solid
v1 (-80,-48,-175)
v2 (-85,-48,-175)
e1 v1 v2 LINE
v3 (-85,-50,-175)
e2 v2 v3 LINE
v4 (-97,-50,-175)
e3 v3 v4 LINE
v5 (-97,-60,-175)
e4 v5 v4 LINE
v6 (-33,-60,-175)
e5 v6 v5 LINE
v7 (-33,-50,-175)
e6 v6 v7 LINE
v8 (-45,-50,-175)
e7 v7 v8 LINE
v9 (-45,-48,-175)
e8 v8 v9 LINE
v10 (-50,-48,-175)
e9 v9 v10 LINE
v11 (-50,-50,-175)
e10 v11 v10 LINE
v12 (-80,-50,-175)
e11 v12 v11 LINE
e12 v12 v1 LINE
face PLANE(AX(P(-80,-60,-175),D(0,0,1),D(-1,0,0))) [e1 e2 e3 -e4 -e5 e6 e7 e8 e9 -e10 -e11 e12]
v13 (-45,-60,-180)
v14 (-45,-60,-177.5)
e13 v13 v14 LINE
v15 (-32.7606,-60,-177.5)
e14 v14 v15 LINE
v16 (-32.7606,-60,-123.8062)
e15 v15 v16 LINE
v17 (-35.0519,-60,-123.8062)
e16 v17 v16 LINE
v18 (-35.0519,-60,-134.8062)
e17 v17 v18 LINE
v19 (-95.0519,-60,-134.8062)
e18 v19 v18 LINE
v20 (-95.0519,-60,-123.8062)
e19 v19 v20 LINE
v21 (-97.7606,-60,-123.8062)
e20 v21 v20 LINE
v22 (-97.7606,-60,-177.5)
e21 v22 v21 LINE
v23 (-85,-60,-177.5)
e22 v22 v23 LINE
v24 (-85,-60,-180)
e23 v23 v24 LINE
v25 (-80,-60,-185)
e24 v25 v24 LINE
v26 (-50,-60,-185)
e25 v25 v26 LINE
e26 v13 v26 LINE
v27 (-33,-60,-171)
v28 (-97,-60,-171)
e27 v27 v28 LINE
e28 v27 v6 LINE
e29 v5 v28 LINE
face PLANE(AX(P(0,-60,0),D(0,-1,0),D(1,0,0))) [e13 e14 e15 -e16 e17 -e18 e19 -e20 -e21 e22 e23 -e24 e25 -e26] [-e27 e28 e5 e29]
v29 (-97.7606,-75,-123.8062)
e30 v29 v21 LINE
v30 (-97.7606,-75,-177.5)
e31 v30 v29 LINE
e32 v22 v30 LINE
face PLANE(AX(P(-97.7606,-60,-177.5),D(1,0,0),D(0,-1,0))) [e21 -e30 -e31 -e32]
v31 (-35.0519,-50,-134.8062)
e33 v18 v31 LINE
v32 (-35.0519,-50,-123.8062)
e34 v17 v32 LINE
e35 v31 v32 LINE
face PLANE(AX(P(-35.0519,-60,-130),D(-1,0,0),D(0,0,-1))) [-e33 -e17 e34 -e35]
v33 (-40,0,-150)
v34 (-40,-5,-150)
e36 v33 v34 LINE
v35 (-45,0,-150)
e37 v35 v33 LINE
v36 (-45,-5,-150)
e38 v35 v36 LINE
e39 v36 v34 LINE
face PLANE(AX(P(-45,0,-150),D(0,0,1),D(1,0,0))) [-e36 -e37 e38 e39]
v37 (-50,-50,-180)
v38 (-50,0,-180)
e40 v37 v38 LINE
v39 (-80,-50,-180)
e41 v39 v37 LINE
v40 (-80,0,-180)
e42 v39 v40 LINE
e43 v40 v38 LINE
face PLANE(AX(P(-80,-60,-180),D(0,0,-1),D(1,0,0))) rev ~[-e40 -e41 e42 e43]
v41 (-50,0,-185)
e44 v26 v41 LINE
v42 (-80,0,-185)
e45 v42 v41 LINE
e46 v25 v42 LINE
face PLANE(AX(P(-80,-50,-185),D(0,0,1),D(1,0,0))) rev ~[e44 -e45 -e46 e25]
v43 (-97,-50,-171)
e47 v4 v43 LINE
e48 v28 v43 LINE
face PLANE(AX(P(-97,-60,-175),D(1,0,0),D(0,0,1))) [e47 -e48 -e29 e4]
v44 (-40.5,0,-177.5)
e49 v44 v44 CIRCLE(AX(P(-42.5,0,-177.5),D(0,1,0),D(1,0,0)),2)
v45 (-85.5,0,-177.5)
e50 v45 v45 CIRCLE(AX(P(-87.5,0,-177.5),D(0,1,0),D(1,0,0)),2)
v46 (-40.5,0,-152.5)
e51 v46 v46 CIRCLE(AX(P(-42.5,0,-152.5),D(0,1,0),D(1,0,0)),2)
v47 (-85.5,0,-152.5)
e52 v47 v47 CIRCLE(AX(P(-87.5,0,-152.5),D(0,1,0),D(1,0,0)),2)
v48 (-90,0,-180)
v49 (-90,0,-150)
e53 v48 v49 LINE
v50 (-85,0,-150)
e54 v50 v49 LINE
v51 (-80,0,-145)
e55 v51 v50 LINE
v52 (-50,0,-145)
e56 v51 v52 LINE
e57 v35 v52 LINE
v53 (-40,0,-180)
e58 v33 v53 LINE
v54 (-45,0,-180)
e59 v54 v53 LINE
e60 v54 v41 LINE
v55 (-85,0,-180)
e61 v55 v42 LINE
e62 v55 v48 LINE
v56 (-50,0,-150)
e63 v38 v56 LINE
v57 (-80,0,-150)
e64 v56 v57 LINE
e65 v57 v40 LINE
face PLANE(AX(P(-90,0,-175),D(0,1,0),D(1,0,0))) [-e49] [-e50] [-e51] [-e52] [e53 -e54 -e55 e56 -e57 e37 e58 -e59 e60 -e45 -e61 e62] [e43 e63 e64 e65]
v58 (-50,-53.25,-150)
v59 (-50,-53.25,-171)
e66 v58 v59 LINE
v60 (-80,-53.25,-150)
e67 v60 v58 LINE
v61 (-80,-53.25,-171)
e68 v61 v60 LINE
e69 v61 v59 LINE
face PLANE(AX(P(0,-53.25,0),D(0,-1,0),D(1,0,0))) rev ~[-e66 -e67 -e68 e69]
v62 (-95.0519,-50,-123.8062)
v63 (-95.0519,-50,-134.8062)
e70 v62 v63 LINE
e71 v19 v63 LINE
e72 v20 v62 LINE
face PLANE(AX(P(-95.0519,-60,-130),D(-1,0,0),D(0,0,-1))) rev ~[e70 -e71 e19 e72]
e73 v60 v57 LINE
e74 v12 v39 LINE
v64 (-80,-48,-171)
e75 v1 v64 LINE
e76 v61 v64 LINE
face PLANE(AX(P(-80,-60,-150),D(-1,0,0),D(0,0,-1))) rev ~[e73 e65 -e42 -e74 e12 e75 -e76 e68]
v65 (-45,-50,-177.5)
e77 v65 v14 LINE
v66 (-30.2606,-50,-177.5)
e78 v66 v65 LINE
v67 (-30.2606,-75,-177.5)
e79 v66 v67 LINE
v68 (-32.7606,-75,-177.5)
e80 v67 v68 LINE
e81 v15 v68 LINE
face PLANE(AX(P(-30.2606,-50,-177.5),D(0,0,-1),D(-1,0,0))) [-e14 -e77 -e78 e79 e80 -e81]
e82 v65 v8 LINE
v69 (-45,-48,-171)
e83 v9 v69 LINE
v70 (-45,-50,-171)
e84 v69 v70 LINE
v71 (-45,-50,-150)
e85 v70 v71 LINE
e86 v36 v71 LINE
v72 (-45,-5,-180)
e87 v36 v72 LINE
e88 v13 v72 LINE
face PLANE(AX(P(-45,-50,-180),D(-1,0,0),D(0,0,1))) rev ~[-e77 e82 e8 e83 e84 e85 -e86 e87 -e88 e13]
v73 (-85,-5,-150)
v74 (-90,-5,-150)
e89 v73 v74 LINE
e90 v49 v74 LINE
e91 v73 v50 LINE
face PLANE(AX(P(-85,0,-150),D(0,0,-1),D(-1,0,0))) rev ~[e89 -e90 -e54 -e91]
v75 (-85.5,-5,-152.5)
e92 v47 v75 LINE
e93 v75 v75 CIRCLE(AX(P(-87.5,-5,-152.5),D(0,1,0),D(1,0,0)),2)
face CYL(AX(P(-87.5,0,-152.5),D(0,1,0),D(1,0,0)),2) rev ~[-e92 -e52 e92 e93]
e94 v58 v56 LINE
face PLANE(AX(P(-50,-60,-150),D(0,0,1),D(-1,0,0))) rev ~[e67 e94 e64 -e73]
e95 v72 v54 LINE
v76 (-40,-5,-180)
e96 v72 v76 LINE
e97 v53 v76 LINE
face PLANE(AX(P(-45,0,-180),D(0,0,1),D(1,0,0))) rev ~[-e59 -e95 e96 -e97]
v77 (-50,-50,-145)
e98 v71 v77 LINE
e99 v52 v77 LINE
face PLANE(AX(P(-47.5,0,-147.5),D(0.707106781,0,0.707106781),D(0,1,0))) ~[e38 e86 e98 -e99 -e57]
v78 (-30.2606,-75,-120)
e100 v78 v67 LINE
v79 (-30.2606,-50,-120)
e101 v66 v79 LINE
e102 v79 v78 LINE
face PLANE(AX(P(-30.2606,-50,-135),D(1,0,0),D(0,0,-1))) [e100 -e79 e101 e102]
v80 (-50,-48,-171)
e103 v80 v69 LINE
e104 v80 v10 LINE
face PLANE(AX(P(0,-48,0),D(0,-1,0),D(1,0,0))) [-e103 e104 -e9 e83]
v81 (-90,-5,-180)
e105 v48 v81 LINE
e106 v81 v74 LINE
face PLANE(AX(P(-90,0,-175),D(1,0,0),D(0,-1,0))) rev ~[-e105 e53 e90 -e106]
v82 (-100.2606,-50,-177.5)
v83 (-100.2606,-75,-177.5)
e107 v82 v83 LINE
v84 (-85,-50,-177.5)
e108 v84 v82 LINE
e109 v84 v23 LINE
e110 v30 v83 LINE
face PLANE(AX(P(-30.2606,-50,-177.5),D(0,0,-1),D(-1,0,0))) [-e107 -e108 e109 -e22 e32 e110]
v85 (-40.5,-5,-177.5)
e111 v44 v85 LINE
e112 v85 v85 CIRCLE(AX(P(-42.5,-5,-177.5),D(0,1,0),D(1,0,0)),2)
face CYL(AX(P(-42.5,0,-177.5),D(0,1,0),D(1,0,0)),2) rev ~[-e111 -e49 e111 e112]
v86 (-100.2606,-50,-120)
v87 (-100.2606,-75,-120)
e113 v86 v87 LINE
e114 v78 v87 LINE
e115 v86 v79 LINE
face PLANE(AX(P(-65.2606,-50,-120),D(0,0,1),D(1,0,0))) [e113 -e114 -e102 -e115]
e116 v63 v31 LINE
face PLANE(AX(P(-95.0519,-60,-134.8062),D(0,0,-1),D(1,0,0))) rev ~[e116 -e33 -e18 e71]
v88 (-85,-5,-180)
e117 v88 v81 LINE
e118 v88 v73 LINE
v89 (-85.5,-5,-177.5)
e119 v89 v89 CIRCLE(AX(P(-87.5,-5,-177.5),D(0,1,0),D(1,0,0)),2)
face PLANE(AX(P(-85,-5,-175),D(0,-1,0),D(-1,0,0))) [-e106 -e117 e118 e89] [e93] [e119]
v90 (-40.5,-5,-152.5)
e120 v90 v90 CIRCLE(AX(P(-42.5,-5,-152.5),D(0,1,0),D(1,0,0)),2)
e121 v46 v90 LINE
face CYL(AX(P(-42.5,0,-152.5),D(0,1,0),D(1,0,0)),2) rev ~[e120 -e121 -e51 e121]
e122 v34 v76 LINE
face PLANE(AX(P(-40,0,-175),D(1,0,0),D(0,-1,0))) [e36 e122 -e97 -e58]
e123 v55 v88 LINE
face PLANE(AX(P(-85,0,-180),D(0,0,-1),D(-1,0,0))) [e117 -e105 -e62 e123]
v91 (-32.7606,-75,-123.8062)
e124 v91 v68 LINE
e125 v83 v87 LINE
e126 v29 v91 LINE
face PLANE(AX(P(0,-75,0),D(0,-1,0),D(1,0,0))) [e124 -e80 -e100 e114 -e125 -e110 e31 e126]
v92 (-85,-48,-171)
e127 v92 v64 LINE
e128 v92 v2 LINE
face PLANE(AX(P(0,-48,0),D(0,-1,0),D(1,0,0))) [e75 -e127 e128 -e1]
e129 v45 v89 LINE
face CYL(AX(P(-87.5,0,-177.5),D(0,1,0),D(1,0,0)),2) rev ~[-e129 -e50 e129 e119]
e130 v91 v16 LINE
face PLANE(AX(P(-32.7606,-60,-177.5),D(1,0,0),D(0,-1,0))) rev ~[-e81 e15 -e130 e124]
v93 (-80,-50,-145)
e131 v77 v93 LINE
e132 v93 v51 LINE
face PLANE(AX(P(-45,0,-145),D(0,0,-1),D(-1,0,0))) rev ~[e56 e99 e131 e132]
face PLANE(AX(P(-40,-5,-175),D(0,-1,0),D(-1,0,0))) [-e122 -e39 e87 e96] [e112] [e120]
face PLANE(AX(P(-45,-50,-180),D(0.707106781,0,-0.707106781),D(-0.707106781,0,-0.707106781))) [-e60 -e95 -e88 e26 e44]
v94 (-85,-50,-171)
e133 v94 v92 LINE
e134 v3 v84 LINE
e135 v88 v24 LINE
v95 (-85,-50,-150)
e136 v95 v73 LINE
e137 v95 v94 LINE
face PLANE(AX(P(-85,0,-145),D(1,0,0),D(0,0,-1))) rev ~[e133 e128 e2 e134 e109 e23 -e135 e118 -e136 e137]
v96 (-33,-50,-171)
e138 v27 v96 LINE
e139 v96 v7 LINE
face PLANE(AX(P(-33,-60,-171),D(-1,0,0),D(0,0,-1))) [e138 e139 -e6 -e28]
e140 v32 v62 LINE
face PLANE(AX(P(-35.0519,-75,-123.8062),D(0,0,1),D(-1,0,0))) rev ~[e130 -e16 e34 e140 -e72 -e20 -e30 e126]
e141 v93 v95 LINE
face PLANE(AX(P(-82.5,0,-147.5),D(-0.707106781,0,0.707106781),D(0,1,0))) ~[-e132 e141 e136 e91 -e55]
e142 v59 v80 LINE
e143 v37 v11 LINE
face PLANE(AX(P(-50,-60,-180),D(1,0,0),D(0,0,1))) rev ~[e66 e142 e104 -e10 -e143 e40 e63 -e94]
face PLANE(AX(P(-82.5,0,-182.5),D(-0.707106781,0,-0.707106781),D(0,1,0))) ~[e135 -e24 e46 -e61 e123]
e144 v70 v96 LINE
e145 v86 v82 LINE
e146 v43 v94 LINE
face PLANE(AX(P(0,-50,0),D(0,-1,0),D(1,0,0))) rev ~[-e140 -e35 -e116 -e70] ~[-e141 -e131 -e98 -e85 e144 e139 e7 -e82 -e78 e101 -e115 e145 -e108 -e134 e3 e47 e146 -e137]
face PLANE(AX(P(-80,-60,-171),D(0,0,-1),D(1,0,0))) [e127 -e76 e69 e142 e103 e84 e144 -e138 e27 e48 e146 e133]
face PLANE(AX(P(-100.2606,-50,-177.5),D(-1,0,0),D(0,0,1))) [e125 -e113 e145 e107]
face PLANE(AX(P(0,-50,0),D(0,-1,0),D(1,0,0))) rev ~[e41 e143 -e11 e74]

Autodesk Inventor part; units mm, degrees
ref_plane "YZ Plane" through (0, 0, 0) normal (1, 0, 0) x (0, 1, 0)
sketch "Boceto1" plane through (0, 0, 0) normal (0, 1, 0) x (-1, 0, 0)
  line L0 (0, 0) -> (0, -154)
  line L1 (35, -185) -> (95, -185)
  line L2 (130, -154) -> (130, 0)
  line L3 (130, 0) -> (0, 0)
  line L4 (0, 0) -> (0, -154) construction
  line L5 (65, -185) -> (95, -185) construction
  line L6 (95, -185) -> (95, -206.4869) construction
  line L7 (95, -206.4869) -> (35, -206.4869) construction
  line L8 (35, -206.4869) -> (35, -185) construction
  line L9 (0, -154) -> (35, -185)
  line L10 (95, -185) -> (130, -154)
  line L11 (61.4516, 0) -> (61.4516, -5) construction
  line L12 (130, -81.3037) -> (125, -81.3037) construction
  line L13 (0, -85.0807) -> (5, -85.0807) construction
  line L14 (125, -5) -> (5, -5)
  line L15 (5, -5) -> (5, -148.3548)
  line L16 (125, -148.3548) -> (125, -5)
  line L17 (112.5, -169.5) -> (109.1848, -165.7571) construction
  line L18 (65, -185) -> (65, -180) construction
  line L19 (17.5, -169.5) -> (20.8152, -165.7571) construction
  line L20 (20.8152, -165.7571) -> (5, -151.7493)
  line L21 (20.8152, -165.7571) -> (36.8959, -180)
  line L22 (36.8959, -180) -> (93.1041, -180)
  line L23 (93.1041, -180) -> (125, -151.7493)
  line L24 (125, -151.7493) -> (125, -148.3548)
  line L25 (5, -148.3548) -> (5, -151.7493)
  dimension "d2" = 154
  dimension "d3" = 30
  dimension "d4" = 60
  dimension "d5" = 5
  dimension "d6" = 5
  dimension "d7" = 5
  dimension "d8" = 5
  dimension "d9" = 5
  dimension "d10" = 5
extrude "Extrusión1" add sketch "Boceto1" along normal blind 3 contours L16 L24 L23 L22 L21 L20 L25 L15 L14
extrude "Extrusión2" add sketch "Boceto1" along normal blind 35
ref_plane "Plano de trabajo1" through (0, 20, 0) normal (0, 1, 0) x (-1, 0, 0)
sketch "Boceto2" plane through (0, 20, 0) normal (0, 1, 0) x (-1, 0, 0)
  line L0 (0, 0) -> (0, -154) construction
  line L1 (0, 0) -> (0, -26.749) construction
  line L2 (130, -154) -> (130, 0) construction
  line L3 (125, -151.7493) -> (93.1041, -180) construction
  line L4 (125, -151.7493) -> (5, -151.7493) construction
  line L5 (65, -151.7493) -> (65, -26.749) construction
  line L6 (125, -89.2492) -> (5, -89.2492) construction
  line L7 (5, -151.7493) -> (5, -5) construction
  line L8 (125, -26.749) -> (125, -31.749) construction
  line L9 (125, -31.749) -> (120, -31.749) construction
  line L10 (120, -31.749) -> (120, -26.749) construction
  line L11 (125, -31.749) -> (120, -26.749) construction
  line L12 (120, -31.749) -> (125, -26.749) construction
  line L13 (125, -31.749) -> (125, -26.749)
  arc A0 (120, -26.749) -> (125, -31.749) centre (122.5, -29.249) ccw
  line L14 (5, -26.749) -> (5, -31.749) construction
  line L15 (5, -31.749) -> (5, -26.749)
  arc A1 (5, -31.749) -> (10, -26.749) centre (7.5, -29.249) ccw
  arc A2 (125, -26.749) -> (120.5, -32.1645) centre (122.5, -29.249) ccw
  arc A3 (10.6306, -27.606) -> (5, -26.749) centre (7.5, -29.249) ccw
  line L16 (5, -26.749) -> (5, -173.4983) construction
  line L17 (125, -151.7493) -> (125, -146.7493) construction
  line L18 (120, -146.7493) -> (125, -151.7493) construction
  line L19 (125, -146.7493) -> (125, -151.7493)
  arc A4 (125, -146.7493) -> (120, -151.7493) centre (122.5, -149.2493) ccw
  arc A5 (10, -151.7493) -> (5, -146.7493) centre (7.5, -149.2493) ccw
  line L20 (5, -151.7493) -> (5, -146.7493) construction
  line L21 (5, -146.7493) -> (5, -151.7493)
  arc A6 (120.5, -146.3339) -> (125, -151.7493) centre (122.5, -149.2493) ccw
  arc A7 (5, -151.7493) -> (10.6306, -150.8923) centre (7.5, -149.2493) ccw
  circle A8 centre (7.5, -29.249) radius 2.5
  circle A9 centre (122.5, -29.249) radius 2.5
  circle A10 centre (122.5, -149.2493) radius 2.5
  circle A11 centre (7.5, -149.2493) radius 2.5
  point P0 (10, -151.7493)
  point P1 (10, -26.749)
  point P2 (120, -26.749)
  dimension "d16" = 26.749
  dimension "d43" = 5
  dimension "d44" = 5
  dimension "d45" = 5
  dimension "d46" = 5
extrude "Extrusión3" add sketch "Boceto2" against normal blind 17 contours A9 | A0 A2 L13 | A8 | L15 A3 A1 | A10 | L19 A6 A4 | A11 | A7 L21 A5
extrude "Extrusión4" cut sketch "Boceto2" against normal through all contours A9 | A8 | A10 | A11
sketch "Boceto3" plane through (0, 3, 0) normal (0, 1, 0) x (1, 0, 0)
  line L0 (-125, 5) -> (-5, 5) construction
  line L1 (-65, 5) -> (-110, 5) construction
  line L2 (-110, 5) -> (-110, 15) construction
  line L3 (-110, 15) -> (-20, 15)
  line L4 (-20, 15) -> (-20, 139.5644)
  line L5 (-110, 139.5644) -> (-110, 15)
  line L6 (-106.9205, 15) -> (-103.9205, 15)
  line L7 (-20, 139.5644) -> (-20, 15)
  line L8 (-110, 15) -> (-20, 15)
  line L9 (-110, 15) -> (-110, 139.5644)
  line L10 (-83.4405, 15) -> (-81.4405, 15)
  line L11 (-77.5705, 15) -> (-75.5705, 15)
  line L12 (-87.3105, 15) -> (-89.3105, 15)
  line L13 (-93.1805, 15) -> (-95.1805, 15)
  line L14 (-98.0505, 15) -> (-100.0505, 15)
  line L15 (-103.9205, 15) -> (-106.9205, 15)
  line L16 (-71.7005, 15) -> (-69.7005, 15)
  line L17 (-65.8305, 15) -> (-63.8305, 15)
  line L18 (-59.9605, 15) -> (-57.9605, 15)
  line L19 (-54.0905, 15) -> (-52.0905, 15)
  line L20 (-48.2205, 15) -> (-46.2205, 15)
  line L21 (-42.3505, 15) -> (-40.3505, 15)
  line L22 (-36.4805, 15) -> (-34.4805, 15)
  line L23 (-30.6105, 15) -> (-28.6105, 15)
  line L24 (-24.7405, 15) -> (-22.7405, 15)
  line L25 (-35, 185) -> (-95, 185) projected
  line L26 (-20, 139.5644) -> (-110, 139.5644)
  line L27 (-103.9205, 15) -> (-103.9205, 139.5644)
  line L28 (-106.9205, 139.5644) -> (-106.9205, 15)
  line L29 (-100.9205, 15) -> (-100.9205, 139.5644)
  line L30 (-103.9205, 139.5644) -> (-103.9205, 15)
  line L31 (-97.9205, 15) -> (-97.9205, 139.5644)
  line L32 (-100.9205, 139.5644) -> (-100.9205, 15)
  line L33 (-94.9205, 15) -> (-94.9205, 139.5644)
  line L34 (-97.9205, 139.5644) -> (-97.9205, 15)
  line L35 (-91.9205, 15) -> (-91.9205, 139.5644)
  line L36 (-94.9205, 139.5644) -> (-94.9205, 15)
  line L37 (-88.9205, 15) -> (-88.9205, 139.5644)
  line L38 (-91.9205, 139.5644) -> (-91.9205, 15)
  line L39 (-85.9205, 15) -> (-85.9205, 139.5644)
  line L40 (-88.9205, 139.5644) -> (-88.9205, 15)
  line L41 (-82.9205, 15) -> (-82.9205, 139.5644)
  line L42 (-85.9205, 139.5644) -> (-85.9205, 15)
  line L43 (-79.9205, 15) -> (-79.9205, 139.5644)
  line L44 (-82.9205, 139.5644) -> (-82.9205, 15)
  line L45 (-76.9205, 15) -> (-76.9205, 139.5644)
  line L46 (-79.9205, 139.5644) -> (-79.9205, 15)
  line L47 (-73.9205, 15) -> (-73.9205, 139.5644)
  line L48 (-76.9205, 139.5644) -> (-76.9205, 15)
  line L49 (-70.9205, 15) -> (-70.9205, 139.5644)
  line L50 (-73.9205, 139.5644) -> (-73.9205, 15)
  line L51 (-67.9205, 15) -> (-67.9205, 139.5644)
  line L52 (-70.9205, 139.5644) -> (-70.9205, 15)
  line L53 (-64.9205, 15) -> (-64.9205, 139.5644)
  line L54 (-67.9205, 139.5644) -> (-67.9205, 15)
  line L55 (-61.9205, 15) -> (-61.9205, 139.5644)
  line L56 (-64.9205, 139.5644) -> (-64.9205, 15)
  line L57 (-58.9205, 15) -> (-58.9205, 139.5644)
  line L58 (-61.9205, 139.5644) -> (-61.9205, 15)
  line L59 (-55.9205, 15) -> (-55.9205, 139.5644)
  line L60 (-58.9205, 139.5644) -> (-58.9205, 15)
  line L61 (-52.9205, 15) -> (-52.9205, 139.5644)
  line L62 (-55.9205, 139.5644) -> (-55.9205, 15)
  line L63 (-49.9205, 15) -> (-49.9205, 139.5644)
  line L64 (-52.9205, 139.5644) -> (-52.9205, 15)
  line L65 (-46.9205, 15) -> (-46.9205, 139.5644)
  line L66 (-49.9205, 139.5644) -> (-49.9205, 15)
  line L67 (-43.9205, 15) -> (-43.9205, 139.5644)
  line L68 (-46.9205, 139.5644) -> (-46.9205, 15)
  line L69 (-40.9205, 15) -> (-40.9205, 139.5644)
  line L70 (-43.9205, 139.5644) -> (-43.9205, 15)
  line L71 (-37.9205, 15) -> (-37.9205, 139.5644)
  line L72 (-40.9205, 139.5644) -> (-40.9205, 15)
  line L73 (-34.9205, 15) -> (-34.9205, 139.5644)
  line L74 (-37.9205, 139.5644) -> (-37.9205, 15)
  line L75 (-31.9205, 15) -> (-31.9205, 139.5644)
  line L76 (-34.9205, 139.5644) -> (-34.9205, 15)
  line L77 (-28.9205, 15) -> (-28.9205, 139.5644)
  line L78 (-31.9205, 139.5644) -> (-31.9205, 15)
  line L79 (-25.9205, 15) -> (-25.9205, 139.5644)
  line L80 (-28.9205, 139.5644) -> (-28.9205, 15)
  line L81 (-22.9205, 15) -> (-22.9205, 139.5644)
  line L82 (-25.9205, 139.5644) -> (-25.9205, 15)
  point P0 (0, 0)
  dimension "d24" = 45
  dimension "d25" = 10
  dimension "d32" = 5.87
  dimension "d47" = 3
  dimension "d50" = 3
extrude "Extrusión5" cut sketch "Boceto3" against normal blind 10 contours L5 L26 L28 L3 | L27 L26 L29 L3 | L26 L33 L3 L31 | L26 L37 L3 L35 | L26 L41 L3 L39 | L26 L45 L3 L43 | L26 L49 L3 L47 | L26 L53 L3 L51 | L26 L57 L3 L55 | L26 L61 L3 L59 | L26 L65 L3 L63 | L26 L69 L3 L67 | L26 L73 L3 L71 | L26 L77 L3 L75 | L26 L81 L3 L79
fillet "Empalme1" radius 5 4 edges at (-130, 17.5, 0) (0, 17.5, 0) (0, 17.5, -154) (-130, 17.5, -154)
fillet "Empalme2" radius 5 2 edges at (-95, 17.5, -185) (-35, 17.5, -185)
sketch "Sketch5" plane through (-125, 3, -146.7493) normal (1, 0, 0) x (0, 0, -1)
  line L0 (0, 0) -> (-115.0003, 0) construction
  line L1 (-110.8969, 0) -> (-110.8969, 17.0593) construction
  line L2 (-4.4814, 0) -> (-4.4814, 32) construction
  line L3 (-141.7493, 32) -> (5, 32) construction
  line L4 (-110.8969, 0) -> (-4.4814, 0)
  line L5 (-4.4814, 0) -> (-4.4814, 25.5232)
  line L6 (-4.4814, 25.5232) -> (-110.8969, 25.5232)
  line L7 (-110.8969, 25.5232) -> (-110.8969, 0)
  line L8 (-110.8969, 25.5232) -> (-4.4814, 25.5232)
  line L9 (-4.4814, 25.5232) -> (-4.4814, 52.7113)
  line L10 (-4.4814, 52.7113) -> (-110.8969, 52.7113)
  line L11 (-110.8969, 52.7113) -> (-110.8969, 25.5232)
  point P0 (-146.7493, -3)
  point P1 (-115.0003, 17)
  point P2 (0, 17)
  point P3 (5, 32)
extrude "Extrusion6" cut sketch "Sketch5" against normal through all
sketch "Sketch6" plane through (-122.5, 20, -29.249) normal (0, 1, 0) x (1, 0, 0)
  arc A0 (-2.5, -2.5) -> (-2.5, 2.5) centre (0, 0) ccw projected
  circle A1 centre (0, 0) radius 2.5 projected
  arc A2 (-2.5, 117.5003) -> (-2.1798, 122.784) centre (0, 120.0003) ccw projected
  circle A3 centre (0, 120.0003) radius 2.5 projected
  arc A4 (117.1798, 122.784) -> (117.5, 117.5003) centre (115, 120.0003) ccw projected
  circle A5 centre (115, 120.0003) radius 2.5 projected
  circle A6 centre (115, 0) radius 2.5 projected
  arc A7 (117.5, 2.5) -> (117.5, -2.5) centre (115, 0) ccw projected
  circle A8 centre (0, 0) radius 2.5
  circle A9 centre (0, 0) radius 3.5355
  circle A10 centre (0, 120.0003) radius 2.5
  circle A11 centre (0, 120.0003) radius 3.5355
  circle A12 centre (115, 120.0003) radius 2.5
  circle A13 centre (115, 120.0003) radius 3.5355
  circle A14 centre (115, 0) radius 2.5
  circle A15 centre (115, 0) radius 3.5355
  point P0 (122.5, -29.249)
  point P1 (-2.5, 0)
  point P2 (-2.5, 120.0003)
  point P3 (117.5, 120.0003)
  point P4 (117.5, 0)
  point P5 (-2.5, -2.5)
  point P6 (-2.5, 117.5003)
  point P7 (117.5, 117.5003)
  point P8 (117.5, -2.5)
extrude "Extrusion7" add sketch "Sketch6" along normal blind 15
sketch "Sketch7" plane through (0, 0, 0) normal (0, -1, 0) x (1, 0, 0)
  line L0 (-36.8959, -185) -> (-93.1041, -185) construction
  line L1 (-65, -185) -> (-65, 0) construction
  line L2 (-125, 0) -> (-5, 0) construction
  line L3 (-130, -35.8525) -> (-130, -142.2679) construction
  line L4 (-130, -142.2679) -> (0, -142.2679) construction
  line L5 (-65, -185) -> (-85, -185) construction
  line L6 (-65, -185) -> (-45, -185) construction
  line L7 (-45, -185) -> (-45, -145) construction
  line L8 (-45, -145) -> (-85, -145) construction
  line L9 (-45, -145) -> (-85, -145)
  line L10 (-85, -145) -> (-85, -185)
  line L11 (-85, -185) -> (-45, -185)
  line L12 (-45, -185) -> (-45, -145)
  point P0 (0, 0)
  dimension "d57" = 20
  dimension "d58" = 20
  dimension "d59" = 40
extrude "Extrusion8" add sketch "Sketch7" along normal blind 50
sketch "Sketch8" plane through (0, -50, 0) normal (0, -1, 0) x (1, 0, 0)
  line L0 (-45, -185) -> (-45, -145) construction
  line L1 (-45, -145) -> (-85.5281, -185) construction
  line L2 (-36.8959, -185) -> (-93.1041, -185) construction
  line L3 (-85, -145) -> (-85, -185) construction
  line L4 (-85, -145) -> (-45.5212, -185) construction
  line L5 (-32.7606, -175) -> (-32.7606, -137.5)
  line L6 (-32.7606, -137.5) -> (-97.7606, -137.5)
  line L7 (-97.7606, -137.5) -> (-97.7606, -175)
  line L8 (-97.7606, -192.5) -> (-32.7606, -137.5) construction
  line L9 (-32.7606, -192.5) -> (-97.7606, -137.5) construction
  line L10 (-30.2606, -195) -> (-100.2606, -195)
  line L11 (-100.2606, -195) -> (-100.2606, -135)
  line L12 (-100.2606, -135) -> (-30.2606, -195) construction
  line L13 (-30.2606, -135) -> (-100.2606, -195) construction
  line L14 (-65.2606, -135) -> (-65.2606, -130) construction
  line L15 (-65.2606, -130) -> (-100.2606, -130)
  line L16 (-100.2606, -130) -> (-100.2606, -135)
  line L17 (-30.2606, -135) -> (-30.2606, -130)
  line L18 (-30.2606, -130) -> (-65.2606, -130)
  line L19 (-65.2606, -130) -> (-65.2606, -125) construction
  line L20 (-64.9205, -139.5644) -> (-64.9205, -15) construction
  line L21 (-65.2606, -125) -> (-100.2606, -125)
  line L22 (-100.9205, -139.5644) -> (-100.9205, -15) projected
  line L23 (-100.2606, -130) -> (-100.2606, -125)
  line L24 (-65.2606, -125) -> (-30.2606, -125)
  line L25 (-30.2606, -125) -> (-30.2606, -130)
  line L26 (-65.2606, -125) -> (-65.2606, -120) construction
  line L27 (-100.2606, -125) -> (-100.2606, -120)
  line L28 (-100.2606, -120) -> (-65.2606, -120)
  line L29 (-65.2606, -120) -> (-30.2606, -120)
  line L30 (-30.2606, -120) -> (-30.2606, -125)
  line L31 (-100.2606, -195) -> (-100.2606, -175) construction
  line L32 (-97.7606, -175) -> (-32.7606, -175)
  line L33 (-97.7606, -192.5) -> (-97.3439, -192.5)
  line L34 (-33.1773, -192.5) -> (-32.7606, -192.5)
  line L35 (-32.7606, -175) -> (-32.7606, -177.5) construction
  line L36 (-30.2606, -177.5) -> (-100.2606, -177.5)
  line L37 (-30.2606, -135) -> (-30.2606, -195)
  line L38 (-28.9205, -15) -> (-28.9205, -139.5644) projected
  point P0 (0, 0)
  point P1 (-65.2606, -165)
  point P2 (-64.9205, -15)
  dimension "d62" = 65
  dimension "d63" = 55
  dimension "d64" = 70
  dimension "d65" = 60
  dimension "d96" = 5
  dimension "d101" = 5
  dimension "d112" = 20
  dimension "d113" = 2.5
extrude "Extrusion9" add sketch "Sketch8" along normal blind 10 contours L32 L7 L6 L5
extrude "Extrusion10" add sketch "Sketch8" along normal blind 25 contours L18 L15 L23 L21 L24 L25 | L24 L21 L27 L28 L29 L30
chamfer "Chamfer3" distance 5 angle 45 2 edges at (-85, -25, -145) (-45, -25, -145)
ref_plane "Work Plane2" through (0, -75, 0) normal (0, -1, 0) x (1, 0, 0)
chamfer "Chamfer4" distance 5 angle 45 2 edges at (-45, -25, -185) (-85, -25, -185)
sketch "Sketch12" plane through (0, -75, 0) normal (0, -1, 0) x (1, 0, 0)
  point P0 (0, 0)
sketch "Sketch13" plane through (0, -75, 0) normal (0, -1, 0) x (1, 0, 0)
  line L0 (-30.2606, -125) -> (-100.2606, -125) construction
  line L1 (-97.7606, -137.5) -> (-32.7606, -137.5) construction
  line L2 (-65.2606, -137.5) -> (-65.2606, -125) construction
  line L3 (-97.7606, -137.5) -> (-97.7606, -125) construction
  line L4 (-32.7606, -137.5) -> (-32.7606, -125) construction
  line L5 (-97.7606, -131.25) -> (-32.7606, -131.25) construction
  line L6 (-95.2606, -136.25) -> (-35.2606, -126.25) construction
  line L7 (-35.2606, -136.25) -> (-95.2606, -126.25) construction
  line L8 (-30.2606, -120) -> (-100.2606, -120) construction
  line L9 (-97.7606, -125) -> (-97.9205, -120) construction
  line L10 (-97.9205, -15) -> (-97.9205, -139.5644) construction
  line L11 (-35.2606, -126.25) -> (-35.2606, -120) construction
  line L12 (-32.7606, -137.5) -> (-32.7606, -192.5) construction
  line L13 (-97.7606, -120) -> (-32.7606, -137.5) construction
  line L14 (-97.7606, -137.5) -> (-31.9205, -120) construction
  line L15 (-31.9205, -15) -> (-31.9205, -139.5644) construction
  line L16 (-95.0519, -133.8062) -> (-35.0519, -133.8062)
  line L17 (-35.0519, -133.8062) -> (-35.0519, -123.8062)
  line L18 (-35.0519, -123.8062) -> (-95.0519, -123.8062)
  line L19 (-95.0519, -123.8062) -> (-95.0519, -133.8062)
  line L20 (-95.0519, -133.8062) -> (-35.0519, -123.8062) construction
  line L21 (-35.0519, -133.8062) -> (-95.0519, -123.8062) construction
  point P0 (0, 0)
  point P1 (-65.2606, -131.25)
  point P2 (-65.0519, -128.8062)
  dimension "d102" = 60
  dimension "d103" = 10
extrude "Extrusion12" cut sketch "Sketch13" against normal blind 25
sketch "Sketch14" plane through (0, -75, 0) normal (0, -1, 0) x (1, 0, 0)
  line L0 (-32.7606, -137.5) -> (-32.7606, -192.5) projected
  line L1 (-95.0519, -130) -> (-95.0519, -123.8062) projected
  line L2 (-95.0519, -123.8062) -> (-35.0519, -123.8062) projected
  line L3 (-97.7606, -192.5) -> (-97.7606, -137.5) projected
  line L4 (-32.7606, -137.5) -> (-97.7606, -137.5)
  line L5 (-97.7606, -137.5) -> (-97.7606, -123.8062)
  line L6 (-97.7606, -123.8062) -> (-32.7606, -123.8062)
  line L7 (-32.7606, -123.8062) -> (-32.7606, -137.5)
  point P0 (0, 0)
  point P1 (-95.0519, -133.8062)
extrude "Extrusion13" cut sketch "Sketch14" against normal blind 15
sketch "Sketch16" plane through (0, -60, 0) normal (0, -1, 0) x (1, 0, 0)
  line L0 (-85, -150) -> (-85, -175) projected
  line L1 (-85, -150) -> (-80, -145) projected
  line L2 (-50, -145) -> (-80, -145) projected
  line L3 (-50, -145) -> (-45, -150) projected
  line L4 (-45, -175) -> (-45, -150) projected
  line L5 (-45, -180) -> (-50, -185) projected
  line L6 (-80, -185) -> (-50, -185) projected
  line L7 (-80, -185) -> (-85, -180) projected
  line L8 (-50, -150) -> (-80, -150)
  line L9 (-80, -150) -> (-80, -180)
  line L10 (-80, -180) -> (-50, -180)
  line L11 (-50, -180) -> (-50, -150)
  line L12 (-50, -150) -> (-80, -180) construction
  line L13 (-80, -150) -> (-50, -180) construction
  point P0 (0, 0)
  point P1 (-65, -165)
  dimension "d108" = 30
  dimension "d109" = 30
extrude "Extrusion15" cut sketch "Sketch16" against normal blind 60
sketch "Sketch17" plane through (-50, -60, -180) normal (-1, 0, 0) x (0, 0, 1)
  line L0 (30, 0) -> (5, 0) projected
  point P0 (180, 60)
  point P1 (0, 0)
extrude "Extrusion16" add sketch "Sketch8" along normal blind 25 contours L36 L11 L16 L15 L18 L17 L37
sketch "Sketch18" plane through (-50, -50, -177.5) normal (0, 0, -1) x (-1, 0, 0)
  line L0 (47.7606, -10) -> (47.7606, -25) projected
  line L1 (-17.2394, -10) -> (-17.2394, -25) projected
  line L2 (47.7606, -10) -> (-17.2394, -10)
  line L3 (-19.7394, 0) -> (-19.7394, -25) projected
  line L4 (-17.2394, -25) -> (-17.2394, -35.5392)
  line L5 (-17.2394, -35.5392) -> (47.7606, -35.5392)
  line L6 (47.7606, -35.5392) -> (47.7606, -25)
  point P0 (-50, 50)
extrude "Extrusion17" cut sketch "Sketch18" against normal blind 47.75
sketch "Sketch19" plane through (0, -50, 0) normal (0, -1, 0) x (1, 0, 0)
  line L0 (-80, -185) -> (-50, -185) projected
  line L1 (-80, -185) -> (-85, -180) projected
  line L2 (-85, -177.5) -> (-85, -180) projected
  line L3 (-80, -180) -> (-80, -177.5) projected
  line L4 (-50, -180) -> (-80, -180) projected
  line L5 (-50, -177.5) -> (-50, -180) projected
  line L6 (-45, -180) -> (-45, -177.5) projected
  line L7 (-45, -180) -> (-50, -185) projected
  line L8 (-45, -177.5) -> (-50, -177.5) projected
  line L9 (-80, -177.5) -> (-85, -177.5) projected
  line L10 (-80, -177.5) -> (-50, -177.5) projected
  line L11 (-50, -177.5) -> (-80, -177.5)
  point P0 (0, 0)
extrude "Extrusion18" add sketch "Sketch19" along normal blind 10
sketch "Sketch20" plane through (0, 0, 0) normal (0, -1, 0) x (1, 0, 0)
  line L0 (-85, -180) -> (-80, -185) projected
  line L1 (-80, -185) -> (-85, -180)
  line L2 (-80, -145) -> (-85, -150) projected
  line L3 (-85, -180) -> (-85, -150)
  line L4 (-85, -150) -> (-80, -145)
  line L5 (-80, -145) -> (-49.9656, -145)
  line L6 (-93.1041, -180) -> (-36.8959, -180) projected
  line L7 (-49.9656, -145) -> (-44.9656, -150)
  line L8 (-44.9656, -150) -> (-44.9656, -180)
  line L9 (-36.8959, -185) -> (-93.1041, -185) projected
  line L10 (-44.9656, -180) -> (-49.9656, -185)
  line L11 (-36.8959, -185) -> (-50, -185) projected
  line L12 (-49.9656, -185) -> (-36.8959, -185)
  line L13 (-36.8959, -185) -> (24.1886, -177.7709)
  line L14 (24.1886, -177.7709) -> (33.2133, -87.4202)
  line L15 (33.2133, -87.4202) -> (33.6029, -83.52)
  line L16 (33.6029, -83.52) -> (59.5118, 20.6859)
  arc A0 (54.7558, 22.225) -> (59.5118, 20.6859) centre (68.223, 55.7226) ccw
  line L17 (54.7558, 22.225) -> (-146.3613, 43.1407)
  arc A1 (-146.3613, 43.1407) -> (-154.6578, 39.9856) centre (-147.3809, 33.3364) ccw
  line L18 (-154.6578, 39.9856) -> (-200.8291, -46.8166)
  line L19 (-200.8291, -46.8166) -> (-163.556, -203.1842)
  line L20 (-163.556, -203.1842) -> (-92.4425, -201.8425)
  line L21 (-92.4425, -201.8425) -> (-85, -194.4)
  line L22 (-85, -194.4) -> (-80, -185)
  line L23 (-85, -180) -> (-85, -150)
  point P0 (0, 0)
extrude "Extrusion19" cut sketch "Sketch20" against normal through all contours L0 L22 L21 L20 L19 L18 A1 L17 A0 L16 L15 L14 L13 L9 L10 L8 L7 L5 L2 L3
sketch "Sketch21" plane through (-50, -60, -185) normal (0, 0, -1) x (-1, 0, 0)
  line L0 (-5, 10) -> (-5, 60) projected
  line L1 (-5, 60) -> (49.1313, 60)
  line L2 (30, 60) -> (0, 60) projected
  line L3 (49.1313, 60) -> (53.9419, 116.0083)
  arc A0 (25.0787, 120.8189) -> (53.9419, 116.0083) centre (69.7131, 299.6306) ccw
  line L4 (25.0787, 120.8189) -> (-113.7396, 139.0302)
  arc A1 (-113.7396, 139.0302) -> (-109.2726, 107.0745) centre (-53.6227, 131.1436) ccw
  line L5 (-109.2726, 107.0745) -> (-56.0721, 40.422)
  line L6 (-56.0721, 40.422) -> (-11.9959, 40.422)
  line L7 (-11.9959, 40.422) -> (-11.9959, 60)
  line L8 (-11.9959, 60) -> (-5, 60)
  point P0 (-50, 60)
extrude "Extrusion20" cut sketch "Sketch21" against normal through all
ref_plane "Work Plane3" through (-80, 0, -185) normal (0, 1, 0) x (1, 0, 0)
sketch "Sketch23" plane through (-80, 0, -185) normal (0, 1, 0) x (1, 0, 0)
  line L0 (-5, -5) -> (-10, -5)
  line L1 (-10, -5) -> (-10, -10)
  line L2 (-10, -10) -> (-5, -10)
  line L3 (-5, -10) -> (-5, -5)
  line L4 (-5, -35) -> (-5, -5) construction
  line L5 (-5, -20) -> (-15.783, -20) construction
  circle A0 centre (-7.5, -7.5) radius 2
  line L6 (-5, -35) -> (-10, -35)
  line L7 (-10, -35) -> (-10, -30)
  line L8 (-10, -30) -> (-5, -30)
  line L9 (-5, -30) -> (-5, -35)
  circle A1 centre (-7.5, -32.5) radius 2
  line L10 (35, -35) -> (35, -5) construction
  line L11 (35, -5) -> (40, -5)
  line L12 (40, -5) -> (40, -10)
  line L13 (40, -10) -> (35, -10)
  line L14 (35, -10) -> (35, -5)
  circle A2 centre (37.5, -7.5) radius 2
  line L15 (35, -20) -> (51.9517, -20) construction
  line L16 (35, -5) -> (35, -35) construction
  line L17 (35, -35) -> (40, -35)
  line L18 (40, -35) -> (40, -30)
  line L19 (40, -30) -> (35, -30)
  line L20 (35, -30) -> (35, -35)
  circle A3 centre (37.5, -32.5) radius 2
  point P0 (80, -185)
  dimension "d125" = 5
  dimension "d126" = 5
  dimension "d127" = 4
  dimension "d128" = 5
  dimension "d129" = 5
  dimension "d130" = 4
extrude "Extrusion21" add sketch "Sketch23" against normal blind 5
sketch "Sketch24" plane through (-45, 0, -175) normal (0, 0, 1) x (1, 0, 0)
  line L0 (0, -5) -> (0, 0) projected
  line L1 (5, -5) -> (0, -5) projected
  line L2 (0, 0) -> (5, 0) projected
  line L3 (0, -5) -> (0, 0) projected
  line L4 (5, -5) -> (0, -5) projected
  line L5 (5, 0) -> (5, -5) projected
  point P0 (45, 0)
extrude "Extrusion22" add sketch "Sketch24" along normal blind 20
sketch "Sketch25" plane through (-90, 0, -175) normal (0, 0, 1) x (1, 0, 0)
  line L0 (0, 0) -> (5, 0) projected
  line L1 (0, 0) -> (0, -5) projected
  line L2 (5, -5) -> (0, -5) projected
  line L3 (5, 0) -> (5, -5) projected
  point P0 (90, 0)
extrude "Extrusion23" add sketch "Sketch25" along normal blind 20
sketch "Sketch26" plane through (0, -60, 0) normal (0, -1, 0) x (1, 0, 0)
  line L0 (-80, -175) -> (-50, -175) projected
  line L1 (-80, -175) -> (-80, -150) projected
  line L2 (-50, -150) -> (-50, -175) projected
  line L3 (-32.7606, -177.5) -> (-32.7606, -123.8062) projected
  line L4 (-50, -175) -> (-50, -171) construction
  line L5 (-65, -175) -> (-33, -175) construction
  line L6 (-65, -175) -> (-96.8928, -172.3826) construction
  line L7 (-33, -175) -> (-97, -175)
  line L8 (-97, -175) -> (-97, -171)
  line L9 (-97, -171) -> (-33, -171)
  line L10 (-33, -171) -> (-33, -175)
  line L11 (-50, -171) -> (-80, -171)
  line L12 (-80, -171) -> (-80, -150)
  line L13 (-80, -150) -> (-50, -150)
  line L14 (-50, -150) -> (-50, -171)
  point P0 (0, 0)
  dimension "d137" = 4
  dimension "d138" = 32
  dimension "d139" = 32
  dimension "d140" = 64
extrude "Extrusion24" add sketch "Sketch26" against normal blind 6.75 contours L1 L13 L2 L9
extrude "Extrusion25" cut sketch "Sketch26" against normal blind 12 contours L7 L8 L9 L1 | L2 L9 L10 L7
sketch "Sketch27" plane through (0, -60, 0) normal (0, -1, 0) x (1, 0, 0)
  line L0 (-35.0519, -130) -> (-35.0519, -123.8062) projected
  line L1 (-35.0519, -123.8062) -> (-35.0519, -134.8062)
  line L2 (-95.0519, -123.8062) -> (-95.0519, -134.8062)
  line L3 (-95.0519, -134.8062) -> (-35.0519, -134.8062)
  line L4 (-35.0519, -130) -> (-38.8579, -126.9031)
  line L5 (-38.8579, -126.9031) -> (-80.7461, -125.972)
  line L6 (-80.7461, -125.972) -> (-93.5344, -126.9031)
  line L7 (-93.5344, -126.9031) -> (-95.0519, -130)
  point P0 (0, 0)
  dimension "d145" = 11
  dimension "d146" = 11
extrude "Extrusion26" cut sketch "Sketch27" against normal through all
properties part number "Soporte camara"
